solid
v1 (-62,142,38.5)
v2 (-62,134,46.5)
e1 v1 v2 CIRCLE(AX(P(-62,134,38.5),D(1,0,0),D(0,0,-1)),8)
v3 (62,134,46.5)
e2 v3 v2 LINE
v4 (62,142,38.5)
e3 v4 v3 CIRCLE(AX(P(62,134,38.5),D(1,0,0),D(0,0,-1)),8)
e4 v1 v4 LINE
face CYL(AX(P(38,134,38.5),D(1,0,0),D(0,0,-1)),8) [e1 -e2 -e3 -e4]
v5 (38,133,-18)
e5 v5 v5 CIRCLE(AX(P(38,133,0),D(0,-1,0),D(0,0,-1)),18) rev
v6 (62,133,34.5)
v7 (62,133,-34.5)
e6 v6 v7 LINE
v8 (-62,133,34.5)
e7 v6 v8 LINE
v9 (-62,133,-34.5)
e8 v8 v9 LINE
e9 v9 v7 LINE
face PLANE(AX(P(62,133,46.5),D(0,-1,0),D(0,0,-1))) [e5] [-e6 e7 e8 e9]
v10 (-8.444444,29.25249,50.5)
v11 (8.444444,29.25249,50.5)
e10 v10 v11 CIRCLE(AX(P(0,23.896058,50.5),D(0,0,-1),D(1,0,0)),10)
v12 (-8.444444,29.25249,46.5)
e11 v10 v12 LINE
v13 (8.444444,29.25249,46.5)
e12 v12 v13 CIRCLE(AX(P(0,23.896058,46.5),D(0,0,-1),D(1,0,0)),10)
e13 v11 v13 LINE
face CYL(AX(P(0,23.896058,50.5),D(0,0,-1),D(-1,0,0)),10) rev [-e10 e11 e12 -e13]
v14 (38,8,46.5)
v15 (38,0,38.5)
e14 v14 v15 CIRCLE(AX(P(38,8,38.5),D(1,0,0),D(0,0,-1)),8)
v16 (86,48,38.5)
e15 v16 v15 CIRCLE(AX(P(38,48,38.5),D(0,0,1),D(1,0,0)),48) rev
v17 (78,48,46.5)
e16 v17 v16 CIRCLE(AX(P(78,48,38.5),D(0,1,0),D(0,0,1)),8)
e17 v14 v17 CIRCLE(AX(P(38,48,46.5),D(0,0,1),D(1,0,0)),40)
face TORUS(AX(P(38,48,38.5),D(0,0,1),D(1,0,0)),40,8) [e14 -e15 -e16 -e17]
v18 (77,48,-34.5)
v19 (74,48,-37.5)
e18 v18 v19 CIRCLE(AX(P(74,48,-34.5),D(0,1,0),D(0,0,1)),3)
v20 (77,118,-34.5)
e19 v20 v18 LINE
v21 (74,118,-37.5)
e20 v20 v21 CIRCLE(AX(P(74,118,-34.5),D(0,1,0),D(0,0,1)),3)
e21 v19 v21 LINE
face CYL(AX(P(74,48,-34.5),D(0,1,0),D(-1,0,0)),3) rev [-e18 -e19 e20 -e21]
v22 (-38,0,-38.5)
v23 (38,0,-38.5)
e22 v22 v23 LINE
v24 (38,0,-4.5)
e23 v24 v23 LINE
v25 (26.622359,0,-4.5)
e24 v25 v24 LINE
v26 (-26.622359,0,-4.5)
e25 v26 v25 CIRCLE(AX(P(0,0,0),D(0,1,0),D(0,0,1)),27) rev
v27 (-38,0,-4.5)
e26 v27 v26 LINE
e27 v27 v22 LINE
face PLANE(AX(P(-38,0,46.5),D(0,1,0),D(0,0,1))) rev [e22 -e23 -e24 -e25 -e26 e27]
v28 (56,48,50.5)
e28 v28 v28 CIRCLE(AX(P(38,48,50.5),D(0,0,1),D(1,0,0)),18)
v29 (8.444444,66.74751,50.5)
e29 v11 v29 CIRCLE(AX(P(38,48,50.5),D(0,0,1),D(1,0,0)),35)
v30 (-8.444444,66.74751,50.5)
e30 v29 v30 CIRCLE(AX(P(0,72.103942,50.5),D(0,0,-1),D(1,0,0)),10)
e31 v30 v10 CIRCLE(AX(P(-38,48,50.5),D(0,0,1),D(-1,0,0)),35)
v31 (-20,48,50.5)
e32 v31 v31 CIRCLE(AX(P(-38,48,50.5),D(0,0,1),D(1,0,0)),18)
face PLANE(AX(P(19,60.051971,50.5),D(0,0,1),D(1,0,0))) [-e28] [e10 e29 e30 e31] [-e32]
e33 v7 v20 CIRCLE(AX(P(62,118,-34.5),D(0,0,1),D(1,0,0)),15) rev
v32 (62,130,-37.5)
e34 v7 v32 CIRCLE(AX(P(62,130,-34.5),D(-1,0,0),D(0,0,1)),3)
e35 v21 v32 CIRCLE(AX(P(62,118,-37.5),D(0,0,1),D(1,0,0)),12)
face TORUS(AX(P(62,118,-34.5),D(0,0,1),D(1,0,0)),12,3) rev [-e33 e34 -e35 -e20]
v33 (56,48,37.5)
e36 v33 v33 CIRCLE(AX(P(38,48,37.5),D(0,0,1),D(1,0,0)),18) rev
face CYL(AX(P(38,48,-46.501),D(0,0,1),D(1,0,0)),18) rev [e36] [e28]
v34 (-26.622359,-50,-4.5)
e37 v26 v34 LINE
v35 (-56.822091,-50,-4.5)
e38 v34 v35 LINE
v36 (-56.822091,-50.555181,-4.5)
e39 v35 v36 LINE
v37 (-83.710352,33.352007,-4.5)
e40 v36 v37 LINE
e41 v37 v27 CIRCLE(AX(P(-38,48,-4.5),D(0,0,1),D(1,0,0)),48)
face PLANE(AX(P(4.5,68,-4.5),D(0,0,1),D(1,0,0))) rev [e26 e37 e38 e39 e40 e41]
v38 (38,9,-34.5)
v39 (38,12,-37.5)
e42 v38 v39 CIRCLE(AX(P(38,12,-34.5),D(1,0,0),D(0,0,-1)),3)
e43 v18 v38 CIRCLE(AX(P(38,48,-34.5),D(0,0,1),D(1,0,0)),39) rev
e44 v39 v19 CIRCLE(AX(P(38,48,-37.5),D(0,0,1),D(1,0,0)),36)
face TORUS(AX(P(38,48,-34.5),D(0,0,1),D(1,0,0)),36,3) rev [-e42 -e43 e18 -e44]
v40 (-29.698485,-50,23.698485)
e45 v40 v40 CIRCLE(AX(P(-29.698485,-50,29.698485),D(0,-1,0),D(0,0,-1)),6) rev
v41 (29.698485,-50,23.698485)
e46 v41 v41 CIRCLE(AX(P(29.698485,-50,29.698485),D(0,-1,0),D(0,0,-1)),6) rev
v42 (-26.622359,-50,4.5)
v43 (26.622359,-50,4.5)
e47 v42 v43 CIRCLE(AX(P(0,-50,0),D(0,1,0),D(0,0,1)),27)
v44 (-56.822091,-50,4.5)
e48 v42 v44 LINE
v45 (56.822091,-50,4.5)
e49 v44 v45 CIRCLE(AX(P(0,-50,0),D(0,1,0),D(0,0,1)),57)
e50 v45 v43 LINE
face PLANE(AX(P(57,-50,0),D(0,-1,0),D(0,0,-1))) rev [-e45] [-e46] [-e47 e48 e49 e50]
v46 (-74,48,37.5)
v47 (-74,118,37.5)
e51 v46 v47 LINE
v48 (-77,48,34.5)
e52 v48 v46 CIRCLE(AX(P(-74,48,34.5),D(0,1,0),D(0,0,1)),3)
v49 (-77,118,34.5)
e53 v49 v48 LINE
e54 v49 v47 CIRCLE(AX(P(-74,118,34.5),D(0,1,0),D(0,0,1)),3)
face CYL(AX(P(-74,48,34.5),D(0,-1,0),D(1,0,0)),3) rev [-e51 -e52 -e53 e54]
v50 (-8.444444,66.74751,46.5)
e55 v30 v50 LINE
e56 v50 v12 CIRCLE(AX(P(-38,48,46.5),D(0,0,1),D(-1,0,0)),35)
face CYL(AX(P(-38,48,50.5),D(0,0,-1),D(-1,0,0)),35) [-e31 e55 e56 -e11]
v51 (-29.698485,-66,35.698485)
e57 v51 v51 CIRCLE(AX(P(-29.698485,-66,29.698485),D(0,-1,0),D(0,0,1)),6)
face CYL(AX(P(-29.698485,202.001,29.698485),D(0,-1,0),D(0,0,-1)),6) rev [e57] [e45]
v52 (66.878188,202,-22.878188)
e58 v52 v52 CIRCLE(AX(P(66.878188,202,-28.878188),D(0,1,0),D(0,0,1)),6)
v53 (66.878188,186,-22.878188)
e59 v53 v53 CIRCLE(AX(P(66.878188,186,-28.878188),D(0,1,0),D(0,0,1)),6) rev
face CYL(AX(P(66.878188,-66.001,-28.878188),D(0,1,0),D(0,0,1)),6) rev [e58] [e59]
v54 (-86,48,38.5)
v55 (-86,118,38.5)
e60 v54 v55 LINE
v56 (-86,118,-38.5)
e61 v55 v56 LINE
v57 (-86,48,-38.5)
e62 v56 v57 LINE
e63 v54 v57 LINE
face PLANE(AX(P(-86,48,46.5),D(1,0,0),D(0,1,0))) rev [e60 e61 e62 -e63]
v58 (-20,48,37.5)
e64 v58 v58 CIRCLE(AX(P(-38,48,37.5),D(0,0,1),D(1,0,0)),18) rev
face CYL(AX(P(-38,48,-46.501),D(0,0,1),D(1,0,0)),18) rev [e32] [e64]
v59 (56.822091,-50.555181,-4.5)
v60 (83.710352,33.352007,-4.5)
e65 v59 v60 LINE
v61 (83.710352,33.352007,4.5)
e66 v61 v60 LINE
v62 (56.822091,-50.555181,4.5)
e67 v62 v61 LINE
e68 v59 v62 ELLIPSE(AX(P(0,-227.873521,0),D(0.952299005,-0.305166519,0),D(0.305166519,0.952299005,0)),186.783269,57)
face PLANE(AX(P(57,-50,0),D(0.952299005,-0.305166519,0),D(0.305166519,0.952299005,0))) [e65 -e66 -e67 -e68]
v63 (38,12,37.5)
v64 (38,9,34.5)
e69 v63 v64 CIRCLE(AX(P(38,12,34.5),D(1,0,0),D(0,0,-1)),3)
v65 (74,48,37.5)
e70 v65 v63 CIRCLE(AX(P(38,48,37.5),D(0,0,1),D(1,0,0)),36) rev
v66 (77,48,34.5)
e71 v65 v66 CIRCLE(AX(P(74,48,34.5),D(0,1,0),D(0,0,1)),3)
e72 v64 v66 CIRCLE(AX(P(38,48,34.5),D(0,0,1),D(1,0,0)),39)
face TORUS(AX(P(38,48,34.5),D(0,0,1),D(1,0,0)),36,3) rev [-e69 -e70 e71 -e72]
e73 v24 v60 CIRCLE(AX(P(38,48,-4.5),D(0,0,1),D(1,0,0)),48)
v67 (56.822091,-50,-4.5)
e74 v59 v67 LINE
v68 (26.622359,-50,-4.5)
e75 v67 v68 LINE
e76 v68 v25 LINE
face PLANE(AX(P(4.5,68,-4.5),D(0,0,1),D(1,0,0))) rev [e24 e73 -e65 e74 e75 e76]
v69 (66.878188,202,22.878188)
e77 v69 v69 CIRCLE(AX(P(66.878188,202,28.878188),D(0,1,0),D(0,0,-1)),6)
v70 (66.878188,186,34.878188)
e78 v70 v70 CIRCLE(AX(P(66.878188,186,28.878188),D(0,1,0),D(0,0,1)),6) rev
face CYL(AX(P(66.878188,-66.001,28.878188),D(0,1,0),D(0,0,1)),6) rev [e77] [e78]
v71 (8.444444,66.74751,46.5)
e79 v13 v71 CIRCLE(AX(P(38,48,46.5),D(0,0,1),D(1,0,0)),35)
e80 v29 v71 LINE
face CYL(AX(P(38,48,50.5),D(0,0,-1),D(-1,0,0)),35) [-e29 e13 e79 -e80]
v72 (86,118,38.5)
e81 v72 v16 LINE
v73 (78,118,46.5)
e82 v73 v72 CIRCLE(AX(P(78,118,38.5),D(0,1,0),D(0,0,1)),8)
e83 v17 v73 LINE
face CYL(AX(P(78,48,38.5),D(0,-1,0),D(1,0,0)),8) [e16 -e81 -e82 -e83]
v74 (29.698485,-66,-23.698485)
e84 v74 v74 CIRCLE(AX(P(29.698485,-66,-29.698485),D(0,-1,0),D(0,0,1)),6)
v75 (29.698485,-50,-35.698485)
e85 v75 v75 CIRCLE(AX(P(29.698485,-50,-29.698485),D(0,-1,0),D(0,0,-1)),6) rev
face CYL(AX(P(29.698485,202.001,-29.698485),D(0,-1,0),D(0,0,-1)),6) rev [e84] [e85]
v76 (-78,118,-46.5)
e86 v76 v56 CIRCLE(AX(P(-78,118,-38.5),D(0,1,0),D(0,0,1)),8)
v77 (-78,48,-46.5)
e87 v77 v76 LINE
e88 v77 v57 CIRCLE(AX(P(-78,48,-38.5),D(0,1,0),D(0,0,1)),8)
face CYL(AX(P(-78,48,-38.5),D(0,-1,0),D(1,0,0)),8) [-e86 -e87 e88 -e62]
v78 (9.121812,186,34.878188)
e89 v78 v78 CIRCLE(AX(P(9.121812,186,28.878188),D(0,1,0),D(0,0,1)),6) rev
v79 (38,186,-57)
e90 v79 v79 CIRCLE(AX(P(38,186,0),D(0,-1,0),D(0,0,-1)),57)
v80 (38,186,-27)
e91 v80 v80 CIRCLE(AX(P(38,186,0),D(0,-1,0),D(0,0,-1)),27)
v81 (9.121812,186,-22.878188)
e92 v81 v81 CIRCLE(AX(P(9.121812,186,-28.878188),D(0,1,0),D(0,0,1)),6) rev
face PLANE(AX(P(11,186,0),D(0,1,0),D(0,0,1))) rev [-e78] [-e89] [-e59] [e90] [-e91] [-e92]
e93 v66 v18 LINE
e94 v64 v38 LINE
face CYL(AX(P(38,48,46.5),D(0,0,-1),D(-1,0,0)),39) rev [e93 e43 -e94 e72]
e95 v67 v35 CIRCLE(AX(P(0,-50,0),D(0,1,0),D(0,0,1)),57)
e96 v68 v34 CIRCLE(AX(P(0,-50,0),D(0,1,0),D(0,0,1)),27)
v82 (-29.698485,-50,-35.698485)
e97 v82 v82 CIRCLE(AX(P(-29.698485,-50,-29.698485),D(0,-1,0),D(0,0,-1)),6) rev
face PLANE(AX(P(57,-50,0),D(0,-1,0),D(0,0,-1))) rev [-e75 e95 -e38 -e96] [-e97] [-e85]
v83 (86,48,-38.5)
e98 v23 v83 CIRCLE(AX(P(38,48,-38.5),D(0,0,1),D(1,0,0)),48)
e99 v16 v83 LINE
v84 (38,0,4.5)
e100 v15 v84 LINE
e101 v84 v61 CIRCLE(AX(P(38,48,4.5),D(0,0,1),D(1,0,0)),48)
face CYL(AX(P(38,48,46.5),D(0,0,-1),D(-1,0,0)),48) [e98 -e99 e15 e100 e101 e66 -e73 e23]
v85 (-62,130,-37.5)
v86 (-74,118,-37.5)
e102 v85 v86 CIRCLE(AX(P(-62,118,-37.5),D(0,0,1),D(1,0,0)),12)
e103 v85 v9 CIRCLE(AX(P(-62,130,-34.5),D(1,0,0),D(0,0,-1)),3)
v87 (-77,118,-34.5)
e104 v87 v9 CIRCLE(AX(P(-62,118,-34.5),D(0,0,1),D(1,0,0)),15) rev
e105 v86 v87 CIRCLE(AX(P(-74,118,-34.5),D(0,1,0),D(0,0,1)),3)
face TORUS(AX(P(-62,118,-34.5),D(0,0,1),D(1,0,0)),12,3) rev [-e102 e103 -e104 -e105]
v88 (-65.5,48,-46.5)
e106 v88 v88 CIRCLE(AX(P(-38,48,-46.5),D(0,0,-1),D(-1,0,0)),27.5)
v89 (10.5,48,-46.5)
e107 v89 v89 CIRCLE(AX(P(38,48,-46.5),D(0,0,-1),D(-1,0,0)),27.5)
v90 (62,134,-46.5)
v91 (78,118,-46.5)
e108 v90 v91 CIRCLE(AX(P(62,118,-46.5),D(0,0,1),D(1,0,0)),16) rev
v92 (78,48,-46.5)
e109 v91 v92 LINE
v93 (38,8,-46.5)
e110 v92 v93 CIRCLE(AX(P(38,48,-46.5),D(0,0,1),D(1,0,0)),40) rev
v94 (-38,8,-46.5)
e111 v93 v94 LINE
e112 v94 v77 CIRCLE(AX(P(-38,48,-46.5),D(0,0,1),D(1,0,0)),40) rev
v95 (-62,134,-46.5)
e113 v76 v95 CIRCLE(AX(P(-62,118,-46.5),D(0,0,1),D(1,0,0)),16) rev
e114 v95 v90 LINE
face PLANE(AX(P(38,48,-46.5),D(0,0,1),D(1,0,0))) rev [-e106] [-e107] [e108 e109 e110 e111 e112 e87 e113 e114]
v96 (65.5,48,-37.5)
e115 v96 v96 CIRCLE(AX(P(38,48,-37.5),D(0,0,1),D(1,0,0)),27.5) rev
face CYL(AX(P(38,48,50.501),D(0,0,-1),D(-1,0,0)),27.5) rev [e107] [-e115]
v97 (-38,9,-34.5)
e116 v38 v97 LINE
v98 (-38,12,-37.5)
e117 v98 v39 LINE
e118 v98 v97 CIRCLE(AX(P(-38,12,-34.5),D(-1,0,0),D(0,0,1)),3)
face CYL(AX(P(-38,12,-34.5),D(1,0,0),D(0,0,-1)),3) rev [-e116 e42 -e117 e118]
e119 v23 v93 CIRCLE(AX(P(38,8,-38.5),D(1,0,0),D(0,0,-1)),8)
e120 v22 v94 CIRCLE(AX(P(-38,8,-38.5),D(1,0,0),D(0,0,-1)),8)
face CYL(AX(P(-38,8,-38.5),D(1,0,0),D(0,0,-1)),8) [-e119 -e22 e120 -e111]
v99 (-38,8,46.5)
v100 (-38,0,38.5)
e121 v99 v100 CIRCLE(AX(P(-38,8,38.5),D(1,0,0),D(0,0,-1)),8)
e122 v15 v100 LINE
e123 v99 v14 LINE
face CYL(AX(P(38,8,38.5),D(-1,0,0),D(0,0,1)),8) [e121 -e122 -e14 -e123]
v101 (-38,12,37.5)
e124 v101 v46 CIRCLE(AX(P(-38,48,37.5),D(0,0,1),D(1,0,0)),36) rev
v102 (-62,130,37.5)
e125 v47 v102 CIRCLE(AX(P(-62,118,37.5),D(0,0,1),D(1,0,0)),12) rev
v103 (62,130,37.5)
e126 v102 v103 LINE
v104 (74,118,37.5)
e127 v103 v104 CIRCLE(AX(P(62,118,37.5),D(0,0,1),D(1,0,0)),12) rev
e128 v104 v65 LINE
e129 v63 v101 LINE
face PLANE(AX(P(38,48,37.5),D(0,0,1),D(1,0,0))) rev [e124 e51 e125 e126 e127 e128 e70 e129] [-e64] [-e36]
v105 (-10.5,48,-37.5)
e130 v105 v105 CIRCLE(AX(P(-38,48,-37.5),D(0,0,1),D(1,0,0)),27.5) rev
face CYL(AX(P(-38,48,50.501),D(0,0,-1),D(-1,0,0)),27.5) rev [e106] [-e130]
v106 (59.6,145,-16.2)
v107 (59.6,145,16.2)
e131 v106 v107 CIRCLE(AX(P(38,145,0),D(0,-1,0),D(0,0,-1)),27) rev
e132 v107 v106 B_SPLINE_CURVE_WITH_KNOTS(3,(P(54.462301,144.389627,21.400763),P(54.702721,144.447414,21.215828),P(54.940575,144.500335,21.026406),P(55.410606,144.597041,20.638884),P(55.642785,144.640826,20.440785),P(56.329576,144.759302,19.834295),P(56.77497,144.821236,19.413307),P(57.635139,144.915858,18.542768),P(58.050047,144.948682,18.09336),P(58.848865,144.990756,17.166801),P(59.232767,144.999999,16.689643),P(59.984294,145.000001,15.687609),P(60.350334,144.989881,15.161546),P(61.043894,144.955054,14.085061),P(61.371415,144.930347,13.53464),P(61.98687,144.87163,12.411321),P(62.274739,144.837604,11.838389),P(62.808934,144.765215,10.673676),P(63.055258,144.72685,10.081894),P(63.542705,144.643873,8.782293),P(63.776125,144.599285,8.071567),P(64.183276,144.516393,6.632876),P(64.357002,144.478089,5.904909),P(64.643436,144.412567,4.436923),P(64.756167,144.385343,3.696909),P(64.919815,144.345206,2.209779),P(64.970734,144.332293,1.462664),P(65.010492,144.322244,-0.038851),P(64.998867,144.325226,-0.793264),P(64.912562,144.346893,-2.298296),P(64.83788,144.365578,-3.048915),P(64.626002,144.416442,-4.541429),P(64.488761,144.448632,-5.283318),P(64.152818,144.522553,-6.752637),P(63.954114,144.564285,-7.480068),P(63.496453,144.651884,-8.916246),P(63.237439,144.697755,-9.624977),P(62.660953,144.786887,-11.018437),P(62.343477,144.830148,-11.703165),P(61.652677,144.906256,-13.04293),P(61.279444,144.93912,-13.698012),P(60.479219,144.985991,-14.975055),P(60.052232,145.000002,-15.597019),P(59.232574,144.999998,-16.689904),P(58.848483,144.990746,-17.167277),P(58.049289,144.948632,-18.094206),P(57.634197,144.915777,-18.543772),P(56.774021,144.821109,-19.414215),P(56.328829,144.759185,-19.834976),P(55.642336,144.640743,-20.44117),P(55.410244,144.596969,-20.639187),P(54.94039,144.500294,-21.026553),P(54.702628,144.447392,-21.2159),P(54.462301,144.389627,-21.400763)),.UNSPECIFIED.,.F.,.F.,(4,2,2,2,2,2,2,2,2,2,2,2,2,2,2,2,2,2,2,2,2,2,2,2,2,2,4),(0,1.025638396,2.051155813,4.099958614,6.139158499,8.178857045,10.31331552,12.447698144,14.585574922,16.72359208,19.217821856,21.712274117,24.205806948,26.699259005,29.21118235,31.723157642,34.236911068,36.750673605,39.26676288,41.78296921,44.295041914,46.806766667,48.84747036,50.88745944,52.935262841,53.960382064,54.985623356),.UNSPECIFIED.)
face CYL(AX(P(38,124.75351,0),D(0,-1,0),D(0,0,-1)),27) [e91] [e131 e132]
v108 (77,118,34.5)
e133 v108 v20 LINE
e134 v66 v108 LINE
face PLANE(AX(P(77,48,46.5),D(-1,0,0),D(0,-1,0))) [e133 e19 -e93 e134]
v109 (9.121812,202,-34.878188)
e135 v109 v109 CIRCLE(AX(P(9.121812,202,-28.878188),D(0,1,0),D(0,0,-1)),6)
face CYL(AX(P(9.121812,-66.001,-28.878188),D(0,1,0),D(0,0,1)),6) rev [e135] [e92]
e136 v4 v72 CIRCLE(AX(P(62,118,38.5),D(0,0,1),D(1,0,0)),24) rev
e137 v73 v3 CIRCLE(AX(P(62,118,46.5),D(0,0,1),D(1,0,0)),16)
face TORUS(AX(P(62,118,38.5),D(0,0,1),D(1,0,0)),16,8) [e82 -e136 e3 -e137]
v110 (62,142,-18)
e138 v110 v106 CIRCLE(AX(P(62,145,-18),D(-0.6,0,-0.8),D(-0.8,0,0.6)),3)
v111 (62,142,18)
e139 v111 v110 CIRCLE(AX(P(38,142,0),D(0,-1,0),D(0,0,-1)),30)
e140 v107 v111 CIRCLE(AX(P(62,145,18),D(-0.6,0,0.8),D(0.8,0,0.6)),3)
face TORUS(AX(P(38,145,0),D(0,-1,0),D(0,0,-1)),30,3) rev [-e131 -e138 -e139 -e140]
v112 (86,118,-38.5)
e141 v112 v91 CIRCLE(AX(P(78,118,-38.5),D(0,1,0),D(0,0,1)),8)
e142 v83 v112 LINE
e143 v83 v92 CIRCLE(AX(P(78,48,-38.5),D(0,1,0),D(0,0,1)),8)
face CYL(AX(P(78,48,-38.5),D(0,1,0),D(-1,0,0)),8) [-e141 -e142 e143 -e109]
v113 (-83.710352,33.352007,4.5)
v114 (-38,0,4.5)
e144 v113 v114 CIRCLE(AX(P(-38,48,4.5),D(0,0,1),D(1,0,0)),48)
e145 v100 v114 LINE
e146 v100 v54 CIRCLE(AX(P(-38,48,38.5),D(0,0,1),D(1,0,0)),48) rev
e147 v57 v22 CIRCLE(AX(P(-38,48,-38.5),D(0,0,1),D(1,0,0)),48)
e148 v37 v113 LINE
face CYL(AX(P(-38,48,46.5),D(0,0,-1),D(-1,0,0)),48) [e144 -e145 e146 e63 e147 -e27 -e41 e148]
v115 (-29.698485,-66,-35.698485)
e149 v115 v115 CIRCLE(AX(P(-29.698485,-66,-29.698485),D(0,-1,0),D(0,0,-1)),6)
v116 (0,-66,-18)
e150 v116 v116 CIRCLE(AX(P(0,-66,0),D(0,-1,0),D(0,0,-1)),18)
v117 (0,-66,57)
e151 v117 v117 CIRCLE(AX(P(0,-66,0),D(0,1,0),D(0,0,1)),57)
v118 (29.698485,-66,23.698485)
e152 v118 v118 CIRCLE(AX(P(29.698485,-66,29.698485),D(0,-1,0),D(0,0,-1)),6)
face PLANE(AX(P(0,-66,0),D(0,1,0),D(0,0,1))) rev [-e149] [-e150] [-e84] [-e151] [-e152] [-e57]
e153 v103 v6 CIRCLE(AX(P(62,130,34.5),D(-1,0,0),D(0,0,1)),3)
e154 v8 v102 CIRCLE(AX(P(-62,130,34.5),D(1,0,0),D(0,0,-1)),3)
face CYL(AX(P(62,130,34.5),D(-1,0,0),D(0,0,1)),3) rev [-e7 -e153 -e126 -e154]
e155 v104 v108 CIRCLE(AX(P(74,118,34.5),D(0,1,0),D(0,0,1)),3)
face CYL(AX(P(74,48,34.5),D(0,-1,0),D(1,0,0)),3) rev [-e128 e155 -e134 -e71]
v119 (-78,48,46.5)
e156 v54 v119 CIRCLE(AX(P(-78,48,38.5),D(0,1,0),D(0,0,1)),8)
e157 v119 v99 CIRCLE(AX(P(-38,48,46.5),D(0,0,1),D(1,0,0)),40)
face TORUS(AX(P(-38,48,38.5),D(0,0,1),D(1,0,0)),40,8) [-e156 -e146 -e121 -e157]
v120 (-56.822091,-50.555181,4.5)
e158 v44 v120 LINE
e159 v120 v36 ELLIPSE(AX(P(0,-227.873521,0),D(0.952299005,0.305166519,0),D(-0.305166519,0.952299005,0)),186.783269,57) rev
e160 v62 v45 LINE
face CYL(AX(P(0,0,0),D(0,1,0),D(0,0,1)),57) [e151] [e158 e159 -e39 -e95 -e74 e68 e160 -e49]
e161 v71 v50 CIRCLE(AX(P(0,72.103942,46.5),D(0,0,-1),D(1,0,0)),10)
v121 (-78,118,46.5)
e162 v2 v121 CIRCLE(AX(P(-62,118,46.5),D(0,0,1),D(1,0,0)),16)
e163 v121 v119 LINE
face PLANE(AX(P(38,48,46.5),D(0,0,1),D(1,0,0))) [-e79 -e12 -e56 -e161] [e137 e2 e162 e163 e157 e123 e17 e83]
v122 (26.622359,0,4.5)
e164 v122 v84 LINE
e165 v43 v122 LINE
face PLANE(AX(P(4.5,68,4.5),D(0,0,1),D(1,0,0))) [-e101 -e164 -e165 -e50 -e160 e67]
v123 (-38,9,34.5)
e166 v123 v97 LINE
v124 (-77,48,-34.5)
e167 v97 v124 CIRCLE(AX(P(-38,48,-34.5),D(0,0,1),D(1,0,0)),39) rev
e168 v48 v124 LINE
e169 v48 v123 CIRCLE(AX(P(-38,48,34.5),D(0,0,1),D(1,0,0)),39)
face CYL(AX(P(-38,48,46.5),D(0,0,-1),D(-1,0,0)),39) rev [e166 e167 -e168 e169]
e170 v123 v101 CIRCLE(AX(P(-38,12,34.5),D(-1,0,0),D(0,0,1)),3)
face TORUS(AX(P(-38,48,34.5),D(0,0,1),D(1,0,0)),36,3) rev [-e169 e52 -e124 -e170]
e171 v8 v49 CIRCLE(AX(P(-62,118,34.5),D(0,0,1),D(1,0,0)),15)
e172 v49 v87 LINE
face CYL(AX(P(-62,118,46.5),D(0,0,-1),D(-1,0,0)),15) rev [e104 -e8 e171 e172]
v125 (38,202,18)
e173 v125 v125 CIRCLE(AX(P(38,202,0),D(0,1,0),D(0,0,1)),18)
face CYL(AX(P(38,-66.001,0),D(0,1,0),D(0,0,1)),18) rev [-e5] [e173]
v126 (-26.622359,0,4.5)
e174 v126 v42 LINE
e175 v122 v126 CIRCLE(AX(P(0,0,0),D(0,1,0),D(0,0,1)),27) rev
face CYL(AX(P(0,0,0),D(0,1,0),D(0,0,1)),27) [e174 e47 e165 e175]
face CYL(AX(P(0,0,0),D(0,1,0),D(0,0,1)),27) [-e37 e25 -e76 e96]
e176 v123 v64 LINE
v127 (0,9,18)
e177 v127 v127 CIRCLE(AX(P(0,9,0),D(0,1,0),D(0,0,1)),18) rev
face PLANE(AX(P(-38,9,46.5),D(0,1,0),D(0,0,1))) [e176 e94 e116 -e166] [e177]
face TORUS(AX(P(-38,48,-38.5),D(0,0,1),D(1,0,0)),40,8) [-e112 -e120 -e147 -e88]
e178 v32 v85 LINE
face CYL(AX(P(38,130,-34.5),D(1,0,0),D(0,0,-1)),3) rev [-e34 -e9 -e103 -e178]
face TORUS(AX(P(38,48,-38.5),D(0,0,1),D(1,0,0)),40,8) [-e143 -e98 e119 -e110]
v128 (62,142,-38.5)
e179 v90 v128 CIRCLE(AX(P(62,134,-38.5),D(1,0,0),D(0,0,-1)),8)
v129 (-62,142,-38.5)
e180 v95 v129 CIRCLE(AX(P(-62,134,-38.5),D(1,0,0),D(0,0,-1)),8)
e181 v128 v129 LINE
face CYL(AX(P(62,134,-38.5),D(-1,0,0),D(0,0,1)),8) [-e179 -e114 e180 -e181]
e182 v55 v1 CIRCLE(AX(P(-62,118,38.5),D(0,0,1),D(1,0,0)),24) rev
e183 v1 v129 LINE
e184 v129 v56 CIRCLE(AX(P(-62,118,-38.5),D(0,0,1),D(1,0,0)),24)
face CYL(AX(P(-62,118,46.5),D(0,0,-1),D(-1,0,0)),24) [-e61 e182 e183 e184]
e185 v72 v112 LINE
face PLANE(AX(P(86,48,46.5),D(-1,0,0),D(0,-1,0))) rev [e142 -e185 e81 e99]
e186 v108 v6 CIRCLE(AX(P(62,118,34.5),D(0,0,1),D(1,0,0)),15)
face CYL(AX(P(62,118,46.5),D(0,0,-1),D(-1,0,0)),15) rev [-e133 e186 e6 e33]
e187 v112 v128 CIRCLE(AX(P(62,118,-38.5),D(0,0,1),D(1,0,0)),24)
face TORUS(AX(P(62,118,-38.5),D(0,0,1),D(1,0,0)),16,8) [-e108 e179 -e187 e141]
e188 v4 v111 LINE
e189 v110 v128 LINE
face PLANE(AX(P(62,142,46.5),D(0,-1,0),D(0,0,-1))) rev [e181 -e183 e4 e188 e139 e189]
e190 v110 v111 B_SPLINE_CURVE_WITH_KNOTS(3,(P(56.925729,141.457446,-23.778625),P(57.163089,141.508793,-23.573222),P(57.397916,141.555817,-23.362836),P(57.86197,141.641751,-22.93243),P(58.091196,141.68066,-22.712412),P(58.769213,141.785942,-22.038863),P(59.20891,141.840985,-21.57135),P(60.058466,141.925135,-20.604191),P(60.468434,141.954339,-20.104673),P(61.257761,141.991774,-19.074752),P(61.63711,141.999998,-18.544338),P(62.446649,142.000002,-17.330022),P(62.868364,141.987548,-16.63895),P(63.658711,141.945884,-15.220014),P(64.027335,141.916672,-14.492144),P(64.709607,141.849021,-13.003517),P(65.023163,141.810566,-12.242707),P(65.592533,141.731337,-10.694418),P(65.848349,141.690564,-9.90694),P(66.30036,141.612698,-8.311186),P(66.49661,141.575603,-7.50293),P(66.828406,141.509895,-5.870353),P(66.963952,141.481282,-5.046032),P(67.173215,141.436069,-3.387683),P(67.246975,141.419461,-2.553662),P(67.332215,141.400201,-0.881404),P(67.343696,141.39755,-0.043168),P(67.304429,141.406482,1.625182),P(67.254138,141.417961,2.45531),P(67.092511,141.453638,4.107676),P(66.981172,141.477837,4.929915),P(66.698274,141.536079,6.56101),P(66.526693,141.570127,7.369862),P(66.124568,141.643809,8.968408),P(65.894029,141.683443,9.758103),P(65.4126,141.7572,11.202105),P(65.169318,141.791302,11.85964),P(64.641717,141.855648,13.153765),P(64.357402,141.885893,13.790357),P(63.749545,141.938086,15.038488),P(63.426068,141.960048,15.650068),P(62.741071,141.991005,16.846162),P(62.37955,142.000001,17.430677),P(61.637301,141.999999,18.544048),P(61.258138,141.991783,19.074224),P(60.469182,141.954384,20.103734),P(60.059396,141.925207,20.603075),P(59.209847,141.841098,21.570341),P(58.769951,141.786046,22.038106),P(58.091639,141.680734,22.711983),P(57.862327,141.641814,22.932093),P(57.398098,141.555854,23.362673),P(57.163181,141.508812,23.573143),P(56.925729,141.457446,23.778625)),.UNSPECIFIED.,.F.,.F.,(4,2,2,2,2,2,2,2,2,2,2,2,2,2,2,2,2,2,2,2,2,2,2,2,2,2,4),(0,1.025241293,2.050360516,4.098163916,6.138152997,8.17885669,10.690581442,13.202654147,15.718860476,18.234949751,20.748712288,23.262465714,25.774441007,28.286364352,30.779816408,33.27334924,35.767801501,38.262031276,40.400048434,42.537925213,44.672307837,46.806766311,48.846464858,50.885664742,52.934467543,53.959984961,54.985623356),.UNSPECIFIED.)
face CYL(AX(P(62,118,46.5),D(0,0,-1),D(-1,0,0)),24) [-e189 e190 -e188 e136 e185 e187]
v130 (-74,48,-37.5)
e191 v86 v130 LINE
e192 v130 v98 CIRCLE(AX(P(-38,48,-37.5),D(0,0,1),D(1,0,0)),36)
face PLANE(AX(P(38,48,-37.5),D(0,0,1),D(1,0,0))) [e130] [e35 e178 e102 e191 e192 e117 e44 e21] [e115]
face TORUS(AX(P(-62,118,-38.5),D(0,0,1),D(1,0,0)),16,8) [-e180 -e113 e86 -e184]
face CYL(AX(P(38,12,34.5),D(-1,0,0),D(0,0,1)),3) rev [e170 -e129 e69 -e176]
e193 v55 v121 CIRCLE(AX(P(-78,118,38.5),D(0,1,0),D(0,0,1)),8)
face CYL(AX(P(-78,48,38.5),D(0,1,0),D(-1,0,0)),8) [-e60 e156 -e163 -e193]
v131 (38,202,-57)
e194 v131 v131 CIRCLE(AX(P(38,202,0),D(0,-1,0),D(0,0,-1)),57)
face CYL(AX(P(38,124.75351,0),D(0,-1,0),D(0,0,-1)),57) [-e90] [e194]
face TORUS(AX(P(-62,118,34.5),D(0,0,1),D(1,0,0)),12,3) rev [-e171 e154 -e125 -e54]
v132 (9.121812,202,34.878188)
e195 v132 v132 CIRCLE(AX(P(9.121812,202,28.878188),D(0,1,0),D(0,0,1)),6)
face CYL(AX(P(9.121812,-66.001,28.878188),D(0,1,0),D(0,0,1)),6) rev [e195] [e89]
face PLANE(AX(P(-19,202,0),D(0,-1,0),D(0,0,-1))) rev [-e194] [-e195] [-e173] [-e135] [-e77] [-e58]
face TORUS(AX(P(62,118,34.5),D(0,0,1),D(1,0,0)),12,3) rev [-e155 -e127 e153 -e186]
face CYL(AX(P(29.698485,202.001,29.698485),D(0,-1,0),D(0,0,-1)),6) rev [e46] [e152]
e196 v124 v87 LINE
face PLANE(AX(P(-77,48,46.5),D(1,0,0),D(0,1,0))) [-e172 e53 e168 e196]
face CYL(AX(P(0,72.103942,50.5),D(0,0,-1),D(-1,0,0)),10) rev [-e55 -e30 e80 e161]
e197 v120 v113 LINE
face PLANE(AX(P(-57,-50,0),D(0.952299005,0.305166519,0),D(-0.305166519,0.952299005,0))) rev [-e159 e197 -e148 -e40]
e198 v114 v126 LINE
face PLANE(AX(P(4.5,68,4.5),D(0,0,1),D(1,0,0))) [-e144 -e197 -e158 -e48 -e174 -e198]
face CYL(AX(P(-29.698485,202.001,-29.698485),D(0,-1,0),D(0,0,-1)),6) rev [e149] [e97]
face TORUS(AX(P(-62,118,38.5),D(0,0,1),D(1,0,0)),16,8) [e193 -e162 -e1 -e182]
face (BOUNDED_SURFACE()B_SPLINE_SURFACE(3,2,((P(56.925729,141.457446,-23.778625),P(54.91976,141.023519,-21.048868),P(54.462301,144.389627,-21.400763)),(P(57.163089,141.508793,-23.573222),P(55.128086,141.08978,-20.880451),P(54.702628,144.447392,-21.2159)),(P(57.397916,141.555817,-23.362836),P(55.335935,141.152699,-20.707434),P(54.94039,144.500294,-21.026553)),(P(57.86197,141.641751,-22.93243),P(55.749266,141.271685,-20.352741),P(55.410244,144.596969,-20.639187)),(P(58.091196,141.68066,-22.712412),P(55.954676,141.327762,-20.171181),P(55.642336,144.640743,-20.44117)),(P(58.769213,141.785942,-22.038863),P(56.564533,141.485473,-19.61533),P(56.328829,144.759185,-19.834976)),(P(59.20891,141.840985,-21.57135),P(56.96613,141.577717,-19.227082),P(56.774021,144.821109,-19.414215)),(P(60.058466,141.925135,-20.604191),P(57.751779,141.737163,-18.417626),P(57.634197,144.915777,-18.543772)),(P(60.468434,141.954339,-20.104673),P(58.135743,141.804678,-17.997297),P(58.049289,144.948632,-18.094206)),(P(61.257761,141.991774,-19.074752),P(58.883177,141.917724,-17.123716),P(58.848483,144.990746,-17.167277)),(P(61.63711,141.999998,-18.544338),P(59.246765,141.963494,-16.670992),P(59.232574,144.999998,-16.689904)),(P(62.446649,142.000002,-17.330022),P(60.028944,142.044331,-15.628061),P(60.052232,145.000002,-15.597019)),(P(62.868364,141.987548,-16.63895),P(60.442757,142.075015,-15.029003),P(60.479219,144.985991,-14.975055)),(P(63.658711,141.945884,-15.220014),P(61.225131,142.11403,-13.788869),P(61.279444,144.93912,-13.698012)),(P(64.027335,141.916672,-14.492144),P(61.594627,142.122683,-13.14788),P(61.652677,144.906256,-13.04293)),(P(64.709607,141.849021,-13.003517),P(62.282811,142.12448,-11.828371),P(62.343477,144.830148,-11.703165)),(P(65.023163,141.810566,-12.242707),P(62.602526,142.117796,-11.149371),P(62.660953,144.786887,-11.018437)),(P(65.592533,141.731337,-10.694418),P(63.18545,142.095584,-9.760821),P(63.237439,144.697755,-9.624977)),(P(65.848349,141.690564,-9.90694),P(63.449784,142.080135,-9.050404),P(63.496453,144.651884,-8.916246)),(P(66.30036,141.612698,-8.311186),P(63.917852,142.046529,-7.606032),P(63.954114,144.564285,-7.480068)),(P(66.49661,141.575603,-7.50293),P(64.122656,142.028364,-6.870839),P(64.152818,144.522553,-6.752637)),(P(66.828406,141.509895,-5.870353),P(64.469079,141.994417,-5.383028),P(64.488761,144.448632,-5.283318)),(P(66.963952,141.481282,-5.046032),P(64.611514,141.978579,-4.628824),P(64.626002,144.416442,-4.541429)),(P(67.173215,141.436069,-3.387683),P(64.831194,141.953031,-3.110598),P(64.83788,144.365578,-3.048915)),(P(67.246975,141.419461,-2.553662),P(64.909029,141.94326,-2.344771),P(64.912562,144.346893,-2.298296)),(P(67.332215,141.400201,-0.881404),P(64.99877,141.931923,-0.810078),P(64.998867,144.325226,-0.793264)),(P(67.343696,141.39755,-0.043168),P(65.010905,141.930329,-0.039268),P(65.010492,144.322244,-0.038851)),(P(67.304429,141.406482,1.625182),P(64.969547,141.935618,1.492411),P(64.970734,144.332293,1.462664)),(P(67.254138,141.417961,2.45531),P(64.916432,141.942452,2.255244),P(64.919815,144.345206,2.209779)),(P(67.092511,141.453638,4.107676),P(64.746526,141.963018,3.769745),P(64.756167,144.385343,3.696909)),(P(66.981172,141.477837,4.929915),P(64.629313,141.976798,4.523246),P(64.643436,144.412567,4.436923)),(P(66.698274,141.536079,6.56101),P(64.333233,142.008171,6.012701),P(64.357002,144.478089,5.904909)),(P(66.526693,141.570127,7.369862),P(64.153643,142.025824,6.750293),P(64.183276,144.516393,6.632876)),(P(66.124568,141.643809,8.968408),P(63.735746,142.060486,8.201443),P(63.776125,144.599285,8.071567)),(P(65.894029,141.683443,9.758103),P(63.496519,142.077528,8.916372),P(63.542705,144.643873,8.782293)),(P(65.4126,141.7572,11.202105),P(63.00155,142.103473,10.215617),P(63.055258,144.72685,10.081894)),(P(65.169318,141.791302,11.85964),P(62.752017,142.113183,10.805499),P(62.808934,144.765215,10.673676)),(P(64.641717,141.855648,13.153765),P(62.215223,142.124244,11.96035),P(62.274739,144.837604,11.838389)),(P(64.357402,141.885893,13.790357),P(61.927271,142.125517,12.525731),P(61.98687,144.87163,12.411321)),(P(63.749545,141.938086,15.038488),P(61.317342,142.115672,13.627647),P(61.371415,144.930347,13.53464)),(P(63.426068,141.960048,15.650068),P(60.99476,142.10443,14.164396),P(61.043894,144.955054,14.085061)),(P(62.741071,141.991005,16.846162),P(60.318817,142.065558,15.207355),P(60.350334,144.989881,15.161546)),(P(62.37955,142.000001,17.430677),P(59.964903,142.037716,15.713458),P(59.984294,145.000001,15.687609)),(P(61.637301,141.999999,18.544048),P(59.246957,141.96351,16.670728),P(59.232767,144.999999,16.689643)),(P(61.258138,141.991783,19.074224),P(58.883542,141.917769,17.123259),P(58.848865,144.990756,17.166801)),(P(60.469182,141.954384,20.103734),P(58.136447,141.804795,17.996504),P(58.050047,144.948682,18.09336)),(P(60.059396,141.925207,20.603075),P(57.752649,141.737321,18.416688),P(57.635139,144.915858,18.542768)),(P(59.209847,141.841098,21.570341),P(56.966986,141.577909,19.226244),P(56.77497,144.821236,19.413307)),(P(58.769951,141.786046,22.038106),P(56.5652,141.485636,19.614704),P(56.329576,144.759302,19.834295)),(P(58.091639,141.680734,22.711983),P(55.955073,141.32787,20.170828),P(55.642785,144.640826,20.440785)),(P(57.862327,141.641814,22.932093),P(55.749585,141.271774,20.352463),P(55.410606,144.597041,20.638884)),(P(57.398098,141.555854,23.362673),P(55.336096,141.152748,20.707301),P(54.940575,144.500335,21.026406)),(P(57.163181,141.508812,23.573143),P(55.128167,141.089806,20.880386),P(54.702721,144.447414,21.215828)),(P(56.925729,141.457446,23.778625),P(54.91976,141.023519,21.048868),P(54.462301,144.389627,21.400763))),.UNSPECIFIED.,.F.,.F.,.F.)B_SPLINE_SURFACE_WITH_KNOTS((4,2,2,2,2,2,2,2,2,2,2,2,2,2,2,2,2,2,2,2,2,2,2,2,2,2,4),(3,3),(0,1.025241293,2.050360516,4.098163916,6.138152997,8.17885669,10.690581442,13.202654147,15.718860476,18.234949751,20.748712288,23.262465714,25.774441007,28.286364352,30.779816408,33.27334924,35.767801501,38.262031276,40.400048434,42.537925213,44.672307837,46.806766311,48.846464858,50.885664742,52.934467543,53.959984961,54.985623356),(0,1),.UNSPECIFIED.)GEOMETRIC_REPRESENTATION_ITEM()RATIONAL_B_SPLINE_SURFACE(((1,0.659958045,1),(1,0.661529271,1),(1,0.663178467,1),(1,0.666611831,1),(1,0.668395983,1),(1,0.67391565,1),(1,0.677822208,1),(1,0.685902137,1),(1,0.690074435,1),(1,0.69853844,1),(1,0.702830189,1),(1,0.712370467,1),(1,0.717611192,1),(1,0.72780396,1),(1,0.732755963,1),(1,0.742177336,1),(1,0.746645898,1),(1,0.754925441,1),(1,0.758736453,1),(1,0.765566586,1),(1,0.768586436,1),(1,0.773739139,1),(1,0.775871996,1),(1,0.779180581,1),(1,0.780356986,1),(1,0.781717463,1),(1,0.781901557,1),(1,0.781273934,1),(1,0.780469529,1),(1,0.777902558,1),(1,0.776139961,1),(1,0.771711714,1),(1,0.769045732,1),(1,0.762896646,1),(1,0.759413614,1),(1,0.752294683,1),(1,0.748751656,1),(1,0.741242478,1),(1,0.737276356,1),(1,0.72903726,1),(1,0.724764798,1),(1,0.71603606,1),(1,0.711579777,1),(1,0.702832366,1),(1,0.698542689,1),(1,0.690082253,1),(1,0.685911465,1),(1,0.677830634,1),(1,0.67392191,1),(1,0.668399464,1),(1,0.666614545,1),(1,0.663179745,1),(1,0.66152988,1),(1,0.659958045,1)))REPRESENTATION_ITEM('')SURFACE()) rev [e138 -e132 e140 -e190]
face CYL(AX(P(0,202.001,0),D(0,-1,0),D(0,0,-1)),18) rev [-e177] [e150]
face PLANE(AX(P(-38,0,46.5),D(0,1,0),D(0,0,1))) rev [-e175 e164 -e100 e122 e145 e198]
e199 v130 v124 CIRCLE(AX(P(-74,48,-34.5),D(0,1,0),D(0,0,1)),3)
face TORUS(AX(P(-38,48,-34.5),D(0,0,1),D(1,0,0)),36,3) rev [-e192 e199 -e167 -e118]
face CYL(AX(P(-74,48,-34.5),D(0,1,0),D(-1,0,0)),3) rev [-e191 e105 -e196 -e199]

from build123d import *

# Parameters (mm, degrees)
EXTRUDE_1_DEPTH      = 46.5
FILLET_1_R           = 8
SHELL_1_T            = 9
FILLET_2_R           = 3
EXTRUDE_2_DEPTH      = 4
CUT_EXTRUDE_1_REACH  = 194.273
SKETCH_3_R           = 18
CUT_EXTRUDE_2_REACH  = 194.273
SKETCH_4_R           = 27.5
CUT_EXTRUDE_3_REACH  = 291.997
SKETCH_7_R           = 18
CUT_EXTRUDE_4_REACH  = 291.997
SKETCH_8_R           = 18
CUT_EXTRUDE_5_REACH  = 291.997
SKETCH_9_R           = 6
CUT_EXTRUDE_11_REACH = 291.997
SKETCH_17_R          = 6
RIB_1_REACH          = 232.387
SKETCH_18_WALL_W     = 550.300401762
SKETCH_18_WALL_H     = 9
FILLET_7_R           = 3


with BuildPart() as part:
    # 草圖1 → 伸長1 (new, symmetric)
    with BuildSketch(Plane.XY):
        with BuildLine():
            Line((-38, 0), (38, 0))
            ThreePointArc((38, 0), (71.941125497, 14.058874503), (86, 48))
            Line((86, 48), (86, 118))
            ThreePointArc((86, 118), (78.970562748, 134.970562748), (62, 142))
            Line((62, 142), (-62, 142))
            ThreePointArc((-62, 142), (-78.970562748, 134.970562748), (-86, 118))
            Line((-86, 118), (-86, 48))
            ThreePointArc((-86, 48), (-71.941125497, 14.058874503), (-38, 0))
        make_face()
    extrude(amount=EXTRUDE_1_DEPTH, both=True)

    # 圓角1
    fillet_1_edges = [part.edges().sort_by_distance(p)[0] for p in [
        (78.970562748, 134.970562748, 46.5),
        (86, 83, 46.5),
        (71.941125497, 14.058874503, 46.5),
        (0, 0, 46.5),
        (-71.941125497, 14.058874503, 46.5),
        (-86, 83, 46.5),
        (-78.970562748, 134.970562748, 46.5),
        (78.970562748, 134.970562748, -46.5),
        (86, 83, -46.5),
        (71.941125497, 14.058874503, -46.5),
        (0, 0, -46.5),
        (-71.941125497, 14.058874503, -46.5),
        (-86, 83, -46.5),
        (-78.970562748, 134.970562748, -46.5),
        (0, 142, 46.5),
        (0, 142, -46.5),
    ]]
    fillet(fillet_1_edges, radius=FILLET_1_R)

    # 薄殼1 (no face opened: a closed hollow body)
    add(offset(amount=-SHELL_1_T, mode=Mode.PRIVATE), mode=Mode.SUBTRACT)

    # 圓角2
    fillet_2_edges = [part.edges().sort_by_distance(p)[0] for p in [
        (0, 9, 37.5),
        (65.577164466, 20.422835534, 37.5),
        (77, 83, 37.5),
        (72.606601718, 128.606601718, 37.5),
        (0, 133, 37.5),
        (-72.606601718, 128.606601718, 37.5),
        (-77, 83, 37.5),
        (0, 9, -37.5),
        (65.577164466, 20.422835534, -37.5),
        (77, 83, -37.5),
        (72.606601718, 128.606601718, -37.5),
        (0, 133, -37.5),
        (-72.606601718, 128.606601718, -37.5),
        (-77, 83, -37.5),
        (-65.577164466, 20.422835534, 37.5),
        (-65.577164466, 20.422835534, -37.5),
    ]]
    fillet(fillet_2_edges, radius=FILLET_2_R)

    # 草圖2 → 伸長2 (add)
    with BuildSketch(Plane.XY.offset(46.5)):
        with BuildLine():
            ThreePointArc((8.444444444, 29.252489877), (73, 48), (8.444444444, 66.747510123))
            ThreePointArc((8.444444444, 66.747510123), (0, 62.103941586), (-8.444444444, 66.747510123))
            ThreePointArc((-8.444444444, 66.747510123), (-73, 48), (-8.444444444, 29.252489877))
            ThreePointArc((-8.444444444, 29.252489877), (0, 33.896058414), (8.444444444, 29.252489877))
        make_face()
    extrude(amount=EXTRUDE_2_DEPTH)

    # 草圖3 → 除料-伸長1 (cut, up to next)
    with BuildSketch(Plane.XY.offset(50.5), mode=Mode.PRIVATE) as cut_extrude_1_sk1:
        with Locations((38, 48)):
            Circle(SKETCH_3_R)
    cut_extrude_1_tool1 = extrude(cut_extrude_1_sk1.sketch, amount=-CUT_EXTRUDE_1_REACH, mode=Mode.PRIVATE) & part.part
    # 草圖3 → 除料-伸長1 (cut, up to next)
    with BuildSketch(Plane.XY.offset(50.5), mode=Mode.PRIVATE) as cut_extrude_1_sk2:
        with Locations((-38, 48)):
            Circle(SKETCH_3_R)
    cut_extrude_1_tool2 = extrude(cut_extrude_1_sk2.sketch, amount=-CUT_EXTRUDE_1_REACH, mode=Mode.PRIVATE) & part.part
    add(cut_extrude_1_tool1.solids().sort_by_distance((38, 48, 50.5))[0], mode=Mode.SUBTRACT)
    add(cut_extrude_1_tool2.solids().sort_by_distance((-38, 48, 50.5))[0], mode=Mode.SUBTRACT)

    # 草圖4 → 除料-伸長2 (cut, up to next)
    with BuildSketch(Plane(origin=(0, 0, -46.5), x_dir=(-1, 0, 0), z_dir=(0, 0, -1)), mode=Mode.PRIVATE) as cut_extrude_2_sk1:
        with Locations((-38, 48)):
            Circle(SKETCH_4_R)
    cut_extrude_2_tool1 = extrude(cut_extrude_2_sk1.sketch, amount=-CUT_EXTRUDE_2_REACH, mode=Mode.PRIVATE) & part.part
    # 草圖4 → 除料-伸長2 (cut, up to next)
    with BuildSketch(Plane(origin=(0, 0, -46.5), x_dir=(-1, 0, 0), z_dir=(0, 0, -1)), mode=Mode.PRIVATE) as cut_extrude_2_sk2:
        with Locations((38, 48)):
            Circle(SKETCH_4_R)
    cut_extrude_2_tool2 = extrude(cut_extrude_2_sk2.sketch, amount=-CUT_EXTRUDE_2_REACH, mode=Mode.PRIVATE) & part.part
    add(cut_extrude_2_tool1.solids().sort_by_distance((38, 48, -46.5))[0], mode=Mode.SUBTRACT)
    add(cut_extrude_2_tool2.solids().sort_by_distance((-38, 48, -46.5))[0], mode=Mode.SUBTRACT)

    # 草圖5 → 旋轉1 (revolve)
    with BuildSketch(Plane.XY):
        Polygon((0, -66), (57, -66), (57, -50), (27, -50), (27, 0), (0, 0), align=None)
    revolve(axis=Axis((0, 0, 0), (0, -1, 0)))

    # 草圖6 → 旋轉2 (revolve)
    with BuildSketch(Plane.XY):
        Polygon((11, 133), (11, 186), (-19, 186), (-19, 202), (38, 202), (38, 133), align=None)
    revolve(axis=Axis((38, 124.753510303, 0), (0, 1, 0)))

    # 草圖7 → 除料-伸長3 (cut, up to next)
    with BuildSketch(Plane.XZ.offset(66), mode=Mode.PRIVATE) as cut_extrude_3_sk1:
        Circle(SKETCH_7_R)
    cut_extrude_3_tool1 = extrude(cut_extrude_3_sk1.sketch, amount=-CUT_EXTRUDE_3_REACH, mode=Mode.PRIVATE) & part.part
    add(cut_extrude_3_tool1.solids().sort_by_distance((0, -66, 0))[0], mode=Mode.SUBTRACT)

    # 草圖8 → 除料-伸長4 (cut, up to next)
    with BuildSketch(Plane(origin=(0, 202, 0), x_dir=(-1, 0, 0), z_dir=(0, 1, 0)), mode=Mode.PRIVATE) as cut_extrude_4_sk1:
        with Locations((-38, 0)):
            Circle(SKETCH_8_R)
    cut_extrude_4_tool1 = extrude(cut_extrude_4_sk1.sketch, amount=-CUT_EXTRUDE_4_REACH, mode=Mode.PRIVATE) & part.part
    add(cut_extrude_4_tool1.solids().sort_by_distance((38, 202, 0))[0], mode=Mode.SUBTRACT)

    # 草圖9 → 除料-伸長5 (cut, up to next)
    with BuildSketch(Plane.XZ.offset(66), mode=Mode.PRIVATE) as cut_extrude_5_sk1:
        with Locations((29.69848481, 29.69848481)):
            Circle(SKETCH_9_R)
    cut_extrude_5_tool1 = extrude(cut_extrude_5_sk1.sketch, amount=-CUT_EXTRUDE_5_REACH, mode=Mode.PRIVATE) & part.part
    # 草圖9 → 除料-伸長5 (cut, up to next)
    with BuildSketch(Plane.XZ.offset(66), mode=Mode.PRIVATE) as cut_extrude_5_sk2:
        with Locations((-29.69848481, 29.69848481)):
            Circle(SKETCH_9_R)
    cut_extrude_5_tool2 = extrude(cut_extrude_5_sk2.sketch, amount=-CUT_EXTRUDE_5_REACH, mode=Mode.PRIVATE) & part.part
    # 草圖9 → 除料-伸長5 (cut, up to next)
    with BuildSketch(Plane.XZ.offset(66), mode=Mode.PRIVATE) as cut_extrude_5_sk3:
        with Locations((29.69848481, -29.69848481)):
            Circle(SKETCH_9_R)
    cut_extrude_5_tool3 = extrude(cut_extrude_5_sk3.sketch, amount=-CUT_EXTRUDE_5_REACH, mode=Mode.PRIVATE) & part.part
    # 草圖9 → 除料-伸長5 (cut, up to next)
    with BuildSketch(Plane.XZ.offset(66), mode=Mode.PRIVATE) as cut_extrude_5_sk4:
        with Locations((-29.69848481, -29.69848481)):
            Circle(SKETCH_9_R)
    cut_extrude_5_tool4 = extrude(cut_extrude_5_sk4.sketch, amount=-CUT_EXTRUDE_5_REACH, mode=Mode.PRIVATE) & part.part
    add(cut_extrude_5_tool1.solids().sort_by_distance((29.698485, -66, 29.698485))[0], mode=Mode.SUBTRACT)
    add(cut_extrude_5_tool2.solids().sort_by_distance((-29.698485, -66, 29.698485))[0], mode=Mode.SUBTRACT)
    add(cut_extrude_5_tool3.solids().sort_by_distance((29.698485, -66, -29.698485))[0], mode=Mode.SUBTRACT)
    add(cut_extrude_5_tool4.solids().sort_by_distance((-29.698485, -66, -29.698485))[0], mode=Mode.SUBTRACT)

    # 草圖17 → 除料-伸長11 (cut, up to next)
    with BuildSketch(Plane(origin=(0, 202, 0), x_dir=(1, 0, 0), z_dir=(0, 1, 0)), mode=Mode.PRIVATE) as cut_extrude_11_sk1:
        with Locations((66.878187984, 28.878187984)):
            Circle(SKETCH_17_R)
    cut_extrude_11_tool1 = extrude(cut_extrude_11_sk1.sketch, amount=-CUT_EXTRUDE_11_REACH, mode=Mode.PRIVATE) & part.part
    # 草圖17 → 除料-伸長11 (cut, up to next)
    with BuildSketch(Plane(origin=(0, 202, 0), x_dir=(1, 0, 0), z_dir=(0, 1, 0)), mode=Mode.PRIVATE) as cut_extrude_11_sk2:
        with Locations((9.121812016, 28.878187984)):
            Circle(SKETCH_17_R)
    cut_extrude_11_tool2 = extrude(cut_extrude_11_sk2.sketch, amount=-CUT_EXTRUDE_11_REACH, mode=Mode.PRIVATE) & part.part
    # 草圖17 → 除料-伸長11 (cut, up to next)
    with BuildSketch(Plane(origin=(0, 202, 0), x_dir=(1, 0, 0), z_dir=(0, 1, 0)), mode=Mode.PRIVATE) as cut_extrude_11_sk3:
        with Locations((66.878187984, -28.878187984)):
            Circle(SKETCH_17_R)
    cut_extrude_11_tool3 = extrude(cut_extrude_11_sk3.sketch, amount=-CUT_EXTRUDE_11_REACH, mode=Mode.PRIVATE) & part.part
    # 草圖17 → 除料-伸長11 (cut, up to next)
    with BuildSketch(Plane(origin=(0, 202, 0), x_dir=(1, 0, 0), z_dir=(0, 1, 0)), mode=Mode.PRIVATE) as cut_extrude_11_sk4:
        with Locations((9.121812016, -28.878187984)):
            Circle(SKETCH_17_R)
    cut_extrude_11_tool4 = extrude(cut_extrude_11_sk4.sketch, amount=-CUT_EXTRUDE_11_REACH, mode=Mode.PRIVATE) & part.part
    add(cut_extrude_11_tool1.solids().sort_by_distance((66.878188, 202, -28.878188))[0], mode=Mode.SUBTRACT)
    add(cut_extrude_11_tool2.solids().sort_by_distance((9.121812, 202, -28.878188))[0], mode=Mode.SUBTRACT)
    add(cut_extrude_11_tool3.solids().sort_by_distance((66.878188, 202, 28.878188))[0], mode=Mode.SUBTRACT)
    add(cut_extrude_11_tool4.solids().sort_by_distance((9.121812, 202, 28.878188))[0], mode=Mode.SUBTRACT)

    # 草圖18 wall → 肋材1 (add, up to next)
    with BuildSketch(Plane(origin=(70.355176126, -8.323996465, 0), x_dir=(0.305166519386, 0.952299005274, 0), z_dir=(-0.952299005274, 0.305166519386, 0)), mode=Mode.PRIVATE) as rib_1_sk1:
        Rectangle(SKETCH_18_WALL_W, SKETCH_18_WALL_H)
    rib_1_tool1 = extrude(rib_1_sk1.sketch, amount=RIB_1_REACH, mode=Mode.PRIVATE) - part.part
    rib_1 = rib_1_tool1.solids().sort_by_distance((70.355176126, -8.323996465, 0))[0]
    add(rib_1)

    # 圓角7
    fillet_7_edges = [part.edges().sort_by_distance(p)[0] for p in [
        (65, 141.8117618, 0),
        (31.636038969, 142, -26.239283527),
    ]]
    fillet(fillet_7_edges, radius=FILLET_7_R)

    # 鏡射1: 肋材1 across plane
    add(rib_1.mirror(Plane(origin=(0, 0, 0), x_dir=(0, 0, 1), z_dir=(1, 0, 0))))


solid = part.part
